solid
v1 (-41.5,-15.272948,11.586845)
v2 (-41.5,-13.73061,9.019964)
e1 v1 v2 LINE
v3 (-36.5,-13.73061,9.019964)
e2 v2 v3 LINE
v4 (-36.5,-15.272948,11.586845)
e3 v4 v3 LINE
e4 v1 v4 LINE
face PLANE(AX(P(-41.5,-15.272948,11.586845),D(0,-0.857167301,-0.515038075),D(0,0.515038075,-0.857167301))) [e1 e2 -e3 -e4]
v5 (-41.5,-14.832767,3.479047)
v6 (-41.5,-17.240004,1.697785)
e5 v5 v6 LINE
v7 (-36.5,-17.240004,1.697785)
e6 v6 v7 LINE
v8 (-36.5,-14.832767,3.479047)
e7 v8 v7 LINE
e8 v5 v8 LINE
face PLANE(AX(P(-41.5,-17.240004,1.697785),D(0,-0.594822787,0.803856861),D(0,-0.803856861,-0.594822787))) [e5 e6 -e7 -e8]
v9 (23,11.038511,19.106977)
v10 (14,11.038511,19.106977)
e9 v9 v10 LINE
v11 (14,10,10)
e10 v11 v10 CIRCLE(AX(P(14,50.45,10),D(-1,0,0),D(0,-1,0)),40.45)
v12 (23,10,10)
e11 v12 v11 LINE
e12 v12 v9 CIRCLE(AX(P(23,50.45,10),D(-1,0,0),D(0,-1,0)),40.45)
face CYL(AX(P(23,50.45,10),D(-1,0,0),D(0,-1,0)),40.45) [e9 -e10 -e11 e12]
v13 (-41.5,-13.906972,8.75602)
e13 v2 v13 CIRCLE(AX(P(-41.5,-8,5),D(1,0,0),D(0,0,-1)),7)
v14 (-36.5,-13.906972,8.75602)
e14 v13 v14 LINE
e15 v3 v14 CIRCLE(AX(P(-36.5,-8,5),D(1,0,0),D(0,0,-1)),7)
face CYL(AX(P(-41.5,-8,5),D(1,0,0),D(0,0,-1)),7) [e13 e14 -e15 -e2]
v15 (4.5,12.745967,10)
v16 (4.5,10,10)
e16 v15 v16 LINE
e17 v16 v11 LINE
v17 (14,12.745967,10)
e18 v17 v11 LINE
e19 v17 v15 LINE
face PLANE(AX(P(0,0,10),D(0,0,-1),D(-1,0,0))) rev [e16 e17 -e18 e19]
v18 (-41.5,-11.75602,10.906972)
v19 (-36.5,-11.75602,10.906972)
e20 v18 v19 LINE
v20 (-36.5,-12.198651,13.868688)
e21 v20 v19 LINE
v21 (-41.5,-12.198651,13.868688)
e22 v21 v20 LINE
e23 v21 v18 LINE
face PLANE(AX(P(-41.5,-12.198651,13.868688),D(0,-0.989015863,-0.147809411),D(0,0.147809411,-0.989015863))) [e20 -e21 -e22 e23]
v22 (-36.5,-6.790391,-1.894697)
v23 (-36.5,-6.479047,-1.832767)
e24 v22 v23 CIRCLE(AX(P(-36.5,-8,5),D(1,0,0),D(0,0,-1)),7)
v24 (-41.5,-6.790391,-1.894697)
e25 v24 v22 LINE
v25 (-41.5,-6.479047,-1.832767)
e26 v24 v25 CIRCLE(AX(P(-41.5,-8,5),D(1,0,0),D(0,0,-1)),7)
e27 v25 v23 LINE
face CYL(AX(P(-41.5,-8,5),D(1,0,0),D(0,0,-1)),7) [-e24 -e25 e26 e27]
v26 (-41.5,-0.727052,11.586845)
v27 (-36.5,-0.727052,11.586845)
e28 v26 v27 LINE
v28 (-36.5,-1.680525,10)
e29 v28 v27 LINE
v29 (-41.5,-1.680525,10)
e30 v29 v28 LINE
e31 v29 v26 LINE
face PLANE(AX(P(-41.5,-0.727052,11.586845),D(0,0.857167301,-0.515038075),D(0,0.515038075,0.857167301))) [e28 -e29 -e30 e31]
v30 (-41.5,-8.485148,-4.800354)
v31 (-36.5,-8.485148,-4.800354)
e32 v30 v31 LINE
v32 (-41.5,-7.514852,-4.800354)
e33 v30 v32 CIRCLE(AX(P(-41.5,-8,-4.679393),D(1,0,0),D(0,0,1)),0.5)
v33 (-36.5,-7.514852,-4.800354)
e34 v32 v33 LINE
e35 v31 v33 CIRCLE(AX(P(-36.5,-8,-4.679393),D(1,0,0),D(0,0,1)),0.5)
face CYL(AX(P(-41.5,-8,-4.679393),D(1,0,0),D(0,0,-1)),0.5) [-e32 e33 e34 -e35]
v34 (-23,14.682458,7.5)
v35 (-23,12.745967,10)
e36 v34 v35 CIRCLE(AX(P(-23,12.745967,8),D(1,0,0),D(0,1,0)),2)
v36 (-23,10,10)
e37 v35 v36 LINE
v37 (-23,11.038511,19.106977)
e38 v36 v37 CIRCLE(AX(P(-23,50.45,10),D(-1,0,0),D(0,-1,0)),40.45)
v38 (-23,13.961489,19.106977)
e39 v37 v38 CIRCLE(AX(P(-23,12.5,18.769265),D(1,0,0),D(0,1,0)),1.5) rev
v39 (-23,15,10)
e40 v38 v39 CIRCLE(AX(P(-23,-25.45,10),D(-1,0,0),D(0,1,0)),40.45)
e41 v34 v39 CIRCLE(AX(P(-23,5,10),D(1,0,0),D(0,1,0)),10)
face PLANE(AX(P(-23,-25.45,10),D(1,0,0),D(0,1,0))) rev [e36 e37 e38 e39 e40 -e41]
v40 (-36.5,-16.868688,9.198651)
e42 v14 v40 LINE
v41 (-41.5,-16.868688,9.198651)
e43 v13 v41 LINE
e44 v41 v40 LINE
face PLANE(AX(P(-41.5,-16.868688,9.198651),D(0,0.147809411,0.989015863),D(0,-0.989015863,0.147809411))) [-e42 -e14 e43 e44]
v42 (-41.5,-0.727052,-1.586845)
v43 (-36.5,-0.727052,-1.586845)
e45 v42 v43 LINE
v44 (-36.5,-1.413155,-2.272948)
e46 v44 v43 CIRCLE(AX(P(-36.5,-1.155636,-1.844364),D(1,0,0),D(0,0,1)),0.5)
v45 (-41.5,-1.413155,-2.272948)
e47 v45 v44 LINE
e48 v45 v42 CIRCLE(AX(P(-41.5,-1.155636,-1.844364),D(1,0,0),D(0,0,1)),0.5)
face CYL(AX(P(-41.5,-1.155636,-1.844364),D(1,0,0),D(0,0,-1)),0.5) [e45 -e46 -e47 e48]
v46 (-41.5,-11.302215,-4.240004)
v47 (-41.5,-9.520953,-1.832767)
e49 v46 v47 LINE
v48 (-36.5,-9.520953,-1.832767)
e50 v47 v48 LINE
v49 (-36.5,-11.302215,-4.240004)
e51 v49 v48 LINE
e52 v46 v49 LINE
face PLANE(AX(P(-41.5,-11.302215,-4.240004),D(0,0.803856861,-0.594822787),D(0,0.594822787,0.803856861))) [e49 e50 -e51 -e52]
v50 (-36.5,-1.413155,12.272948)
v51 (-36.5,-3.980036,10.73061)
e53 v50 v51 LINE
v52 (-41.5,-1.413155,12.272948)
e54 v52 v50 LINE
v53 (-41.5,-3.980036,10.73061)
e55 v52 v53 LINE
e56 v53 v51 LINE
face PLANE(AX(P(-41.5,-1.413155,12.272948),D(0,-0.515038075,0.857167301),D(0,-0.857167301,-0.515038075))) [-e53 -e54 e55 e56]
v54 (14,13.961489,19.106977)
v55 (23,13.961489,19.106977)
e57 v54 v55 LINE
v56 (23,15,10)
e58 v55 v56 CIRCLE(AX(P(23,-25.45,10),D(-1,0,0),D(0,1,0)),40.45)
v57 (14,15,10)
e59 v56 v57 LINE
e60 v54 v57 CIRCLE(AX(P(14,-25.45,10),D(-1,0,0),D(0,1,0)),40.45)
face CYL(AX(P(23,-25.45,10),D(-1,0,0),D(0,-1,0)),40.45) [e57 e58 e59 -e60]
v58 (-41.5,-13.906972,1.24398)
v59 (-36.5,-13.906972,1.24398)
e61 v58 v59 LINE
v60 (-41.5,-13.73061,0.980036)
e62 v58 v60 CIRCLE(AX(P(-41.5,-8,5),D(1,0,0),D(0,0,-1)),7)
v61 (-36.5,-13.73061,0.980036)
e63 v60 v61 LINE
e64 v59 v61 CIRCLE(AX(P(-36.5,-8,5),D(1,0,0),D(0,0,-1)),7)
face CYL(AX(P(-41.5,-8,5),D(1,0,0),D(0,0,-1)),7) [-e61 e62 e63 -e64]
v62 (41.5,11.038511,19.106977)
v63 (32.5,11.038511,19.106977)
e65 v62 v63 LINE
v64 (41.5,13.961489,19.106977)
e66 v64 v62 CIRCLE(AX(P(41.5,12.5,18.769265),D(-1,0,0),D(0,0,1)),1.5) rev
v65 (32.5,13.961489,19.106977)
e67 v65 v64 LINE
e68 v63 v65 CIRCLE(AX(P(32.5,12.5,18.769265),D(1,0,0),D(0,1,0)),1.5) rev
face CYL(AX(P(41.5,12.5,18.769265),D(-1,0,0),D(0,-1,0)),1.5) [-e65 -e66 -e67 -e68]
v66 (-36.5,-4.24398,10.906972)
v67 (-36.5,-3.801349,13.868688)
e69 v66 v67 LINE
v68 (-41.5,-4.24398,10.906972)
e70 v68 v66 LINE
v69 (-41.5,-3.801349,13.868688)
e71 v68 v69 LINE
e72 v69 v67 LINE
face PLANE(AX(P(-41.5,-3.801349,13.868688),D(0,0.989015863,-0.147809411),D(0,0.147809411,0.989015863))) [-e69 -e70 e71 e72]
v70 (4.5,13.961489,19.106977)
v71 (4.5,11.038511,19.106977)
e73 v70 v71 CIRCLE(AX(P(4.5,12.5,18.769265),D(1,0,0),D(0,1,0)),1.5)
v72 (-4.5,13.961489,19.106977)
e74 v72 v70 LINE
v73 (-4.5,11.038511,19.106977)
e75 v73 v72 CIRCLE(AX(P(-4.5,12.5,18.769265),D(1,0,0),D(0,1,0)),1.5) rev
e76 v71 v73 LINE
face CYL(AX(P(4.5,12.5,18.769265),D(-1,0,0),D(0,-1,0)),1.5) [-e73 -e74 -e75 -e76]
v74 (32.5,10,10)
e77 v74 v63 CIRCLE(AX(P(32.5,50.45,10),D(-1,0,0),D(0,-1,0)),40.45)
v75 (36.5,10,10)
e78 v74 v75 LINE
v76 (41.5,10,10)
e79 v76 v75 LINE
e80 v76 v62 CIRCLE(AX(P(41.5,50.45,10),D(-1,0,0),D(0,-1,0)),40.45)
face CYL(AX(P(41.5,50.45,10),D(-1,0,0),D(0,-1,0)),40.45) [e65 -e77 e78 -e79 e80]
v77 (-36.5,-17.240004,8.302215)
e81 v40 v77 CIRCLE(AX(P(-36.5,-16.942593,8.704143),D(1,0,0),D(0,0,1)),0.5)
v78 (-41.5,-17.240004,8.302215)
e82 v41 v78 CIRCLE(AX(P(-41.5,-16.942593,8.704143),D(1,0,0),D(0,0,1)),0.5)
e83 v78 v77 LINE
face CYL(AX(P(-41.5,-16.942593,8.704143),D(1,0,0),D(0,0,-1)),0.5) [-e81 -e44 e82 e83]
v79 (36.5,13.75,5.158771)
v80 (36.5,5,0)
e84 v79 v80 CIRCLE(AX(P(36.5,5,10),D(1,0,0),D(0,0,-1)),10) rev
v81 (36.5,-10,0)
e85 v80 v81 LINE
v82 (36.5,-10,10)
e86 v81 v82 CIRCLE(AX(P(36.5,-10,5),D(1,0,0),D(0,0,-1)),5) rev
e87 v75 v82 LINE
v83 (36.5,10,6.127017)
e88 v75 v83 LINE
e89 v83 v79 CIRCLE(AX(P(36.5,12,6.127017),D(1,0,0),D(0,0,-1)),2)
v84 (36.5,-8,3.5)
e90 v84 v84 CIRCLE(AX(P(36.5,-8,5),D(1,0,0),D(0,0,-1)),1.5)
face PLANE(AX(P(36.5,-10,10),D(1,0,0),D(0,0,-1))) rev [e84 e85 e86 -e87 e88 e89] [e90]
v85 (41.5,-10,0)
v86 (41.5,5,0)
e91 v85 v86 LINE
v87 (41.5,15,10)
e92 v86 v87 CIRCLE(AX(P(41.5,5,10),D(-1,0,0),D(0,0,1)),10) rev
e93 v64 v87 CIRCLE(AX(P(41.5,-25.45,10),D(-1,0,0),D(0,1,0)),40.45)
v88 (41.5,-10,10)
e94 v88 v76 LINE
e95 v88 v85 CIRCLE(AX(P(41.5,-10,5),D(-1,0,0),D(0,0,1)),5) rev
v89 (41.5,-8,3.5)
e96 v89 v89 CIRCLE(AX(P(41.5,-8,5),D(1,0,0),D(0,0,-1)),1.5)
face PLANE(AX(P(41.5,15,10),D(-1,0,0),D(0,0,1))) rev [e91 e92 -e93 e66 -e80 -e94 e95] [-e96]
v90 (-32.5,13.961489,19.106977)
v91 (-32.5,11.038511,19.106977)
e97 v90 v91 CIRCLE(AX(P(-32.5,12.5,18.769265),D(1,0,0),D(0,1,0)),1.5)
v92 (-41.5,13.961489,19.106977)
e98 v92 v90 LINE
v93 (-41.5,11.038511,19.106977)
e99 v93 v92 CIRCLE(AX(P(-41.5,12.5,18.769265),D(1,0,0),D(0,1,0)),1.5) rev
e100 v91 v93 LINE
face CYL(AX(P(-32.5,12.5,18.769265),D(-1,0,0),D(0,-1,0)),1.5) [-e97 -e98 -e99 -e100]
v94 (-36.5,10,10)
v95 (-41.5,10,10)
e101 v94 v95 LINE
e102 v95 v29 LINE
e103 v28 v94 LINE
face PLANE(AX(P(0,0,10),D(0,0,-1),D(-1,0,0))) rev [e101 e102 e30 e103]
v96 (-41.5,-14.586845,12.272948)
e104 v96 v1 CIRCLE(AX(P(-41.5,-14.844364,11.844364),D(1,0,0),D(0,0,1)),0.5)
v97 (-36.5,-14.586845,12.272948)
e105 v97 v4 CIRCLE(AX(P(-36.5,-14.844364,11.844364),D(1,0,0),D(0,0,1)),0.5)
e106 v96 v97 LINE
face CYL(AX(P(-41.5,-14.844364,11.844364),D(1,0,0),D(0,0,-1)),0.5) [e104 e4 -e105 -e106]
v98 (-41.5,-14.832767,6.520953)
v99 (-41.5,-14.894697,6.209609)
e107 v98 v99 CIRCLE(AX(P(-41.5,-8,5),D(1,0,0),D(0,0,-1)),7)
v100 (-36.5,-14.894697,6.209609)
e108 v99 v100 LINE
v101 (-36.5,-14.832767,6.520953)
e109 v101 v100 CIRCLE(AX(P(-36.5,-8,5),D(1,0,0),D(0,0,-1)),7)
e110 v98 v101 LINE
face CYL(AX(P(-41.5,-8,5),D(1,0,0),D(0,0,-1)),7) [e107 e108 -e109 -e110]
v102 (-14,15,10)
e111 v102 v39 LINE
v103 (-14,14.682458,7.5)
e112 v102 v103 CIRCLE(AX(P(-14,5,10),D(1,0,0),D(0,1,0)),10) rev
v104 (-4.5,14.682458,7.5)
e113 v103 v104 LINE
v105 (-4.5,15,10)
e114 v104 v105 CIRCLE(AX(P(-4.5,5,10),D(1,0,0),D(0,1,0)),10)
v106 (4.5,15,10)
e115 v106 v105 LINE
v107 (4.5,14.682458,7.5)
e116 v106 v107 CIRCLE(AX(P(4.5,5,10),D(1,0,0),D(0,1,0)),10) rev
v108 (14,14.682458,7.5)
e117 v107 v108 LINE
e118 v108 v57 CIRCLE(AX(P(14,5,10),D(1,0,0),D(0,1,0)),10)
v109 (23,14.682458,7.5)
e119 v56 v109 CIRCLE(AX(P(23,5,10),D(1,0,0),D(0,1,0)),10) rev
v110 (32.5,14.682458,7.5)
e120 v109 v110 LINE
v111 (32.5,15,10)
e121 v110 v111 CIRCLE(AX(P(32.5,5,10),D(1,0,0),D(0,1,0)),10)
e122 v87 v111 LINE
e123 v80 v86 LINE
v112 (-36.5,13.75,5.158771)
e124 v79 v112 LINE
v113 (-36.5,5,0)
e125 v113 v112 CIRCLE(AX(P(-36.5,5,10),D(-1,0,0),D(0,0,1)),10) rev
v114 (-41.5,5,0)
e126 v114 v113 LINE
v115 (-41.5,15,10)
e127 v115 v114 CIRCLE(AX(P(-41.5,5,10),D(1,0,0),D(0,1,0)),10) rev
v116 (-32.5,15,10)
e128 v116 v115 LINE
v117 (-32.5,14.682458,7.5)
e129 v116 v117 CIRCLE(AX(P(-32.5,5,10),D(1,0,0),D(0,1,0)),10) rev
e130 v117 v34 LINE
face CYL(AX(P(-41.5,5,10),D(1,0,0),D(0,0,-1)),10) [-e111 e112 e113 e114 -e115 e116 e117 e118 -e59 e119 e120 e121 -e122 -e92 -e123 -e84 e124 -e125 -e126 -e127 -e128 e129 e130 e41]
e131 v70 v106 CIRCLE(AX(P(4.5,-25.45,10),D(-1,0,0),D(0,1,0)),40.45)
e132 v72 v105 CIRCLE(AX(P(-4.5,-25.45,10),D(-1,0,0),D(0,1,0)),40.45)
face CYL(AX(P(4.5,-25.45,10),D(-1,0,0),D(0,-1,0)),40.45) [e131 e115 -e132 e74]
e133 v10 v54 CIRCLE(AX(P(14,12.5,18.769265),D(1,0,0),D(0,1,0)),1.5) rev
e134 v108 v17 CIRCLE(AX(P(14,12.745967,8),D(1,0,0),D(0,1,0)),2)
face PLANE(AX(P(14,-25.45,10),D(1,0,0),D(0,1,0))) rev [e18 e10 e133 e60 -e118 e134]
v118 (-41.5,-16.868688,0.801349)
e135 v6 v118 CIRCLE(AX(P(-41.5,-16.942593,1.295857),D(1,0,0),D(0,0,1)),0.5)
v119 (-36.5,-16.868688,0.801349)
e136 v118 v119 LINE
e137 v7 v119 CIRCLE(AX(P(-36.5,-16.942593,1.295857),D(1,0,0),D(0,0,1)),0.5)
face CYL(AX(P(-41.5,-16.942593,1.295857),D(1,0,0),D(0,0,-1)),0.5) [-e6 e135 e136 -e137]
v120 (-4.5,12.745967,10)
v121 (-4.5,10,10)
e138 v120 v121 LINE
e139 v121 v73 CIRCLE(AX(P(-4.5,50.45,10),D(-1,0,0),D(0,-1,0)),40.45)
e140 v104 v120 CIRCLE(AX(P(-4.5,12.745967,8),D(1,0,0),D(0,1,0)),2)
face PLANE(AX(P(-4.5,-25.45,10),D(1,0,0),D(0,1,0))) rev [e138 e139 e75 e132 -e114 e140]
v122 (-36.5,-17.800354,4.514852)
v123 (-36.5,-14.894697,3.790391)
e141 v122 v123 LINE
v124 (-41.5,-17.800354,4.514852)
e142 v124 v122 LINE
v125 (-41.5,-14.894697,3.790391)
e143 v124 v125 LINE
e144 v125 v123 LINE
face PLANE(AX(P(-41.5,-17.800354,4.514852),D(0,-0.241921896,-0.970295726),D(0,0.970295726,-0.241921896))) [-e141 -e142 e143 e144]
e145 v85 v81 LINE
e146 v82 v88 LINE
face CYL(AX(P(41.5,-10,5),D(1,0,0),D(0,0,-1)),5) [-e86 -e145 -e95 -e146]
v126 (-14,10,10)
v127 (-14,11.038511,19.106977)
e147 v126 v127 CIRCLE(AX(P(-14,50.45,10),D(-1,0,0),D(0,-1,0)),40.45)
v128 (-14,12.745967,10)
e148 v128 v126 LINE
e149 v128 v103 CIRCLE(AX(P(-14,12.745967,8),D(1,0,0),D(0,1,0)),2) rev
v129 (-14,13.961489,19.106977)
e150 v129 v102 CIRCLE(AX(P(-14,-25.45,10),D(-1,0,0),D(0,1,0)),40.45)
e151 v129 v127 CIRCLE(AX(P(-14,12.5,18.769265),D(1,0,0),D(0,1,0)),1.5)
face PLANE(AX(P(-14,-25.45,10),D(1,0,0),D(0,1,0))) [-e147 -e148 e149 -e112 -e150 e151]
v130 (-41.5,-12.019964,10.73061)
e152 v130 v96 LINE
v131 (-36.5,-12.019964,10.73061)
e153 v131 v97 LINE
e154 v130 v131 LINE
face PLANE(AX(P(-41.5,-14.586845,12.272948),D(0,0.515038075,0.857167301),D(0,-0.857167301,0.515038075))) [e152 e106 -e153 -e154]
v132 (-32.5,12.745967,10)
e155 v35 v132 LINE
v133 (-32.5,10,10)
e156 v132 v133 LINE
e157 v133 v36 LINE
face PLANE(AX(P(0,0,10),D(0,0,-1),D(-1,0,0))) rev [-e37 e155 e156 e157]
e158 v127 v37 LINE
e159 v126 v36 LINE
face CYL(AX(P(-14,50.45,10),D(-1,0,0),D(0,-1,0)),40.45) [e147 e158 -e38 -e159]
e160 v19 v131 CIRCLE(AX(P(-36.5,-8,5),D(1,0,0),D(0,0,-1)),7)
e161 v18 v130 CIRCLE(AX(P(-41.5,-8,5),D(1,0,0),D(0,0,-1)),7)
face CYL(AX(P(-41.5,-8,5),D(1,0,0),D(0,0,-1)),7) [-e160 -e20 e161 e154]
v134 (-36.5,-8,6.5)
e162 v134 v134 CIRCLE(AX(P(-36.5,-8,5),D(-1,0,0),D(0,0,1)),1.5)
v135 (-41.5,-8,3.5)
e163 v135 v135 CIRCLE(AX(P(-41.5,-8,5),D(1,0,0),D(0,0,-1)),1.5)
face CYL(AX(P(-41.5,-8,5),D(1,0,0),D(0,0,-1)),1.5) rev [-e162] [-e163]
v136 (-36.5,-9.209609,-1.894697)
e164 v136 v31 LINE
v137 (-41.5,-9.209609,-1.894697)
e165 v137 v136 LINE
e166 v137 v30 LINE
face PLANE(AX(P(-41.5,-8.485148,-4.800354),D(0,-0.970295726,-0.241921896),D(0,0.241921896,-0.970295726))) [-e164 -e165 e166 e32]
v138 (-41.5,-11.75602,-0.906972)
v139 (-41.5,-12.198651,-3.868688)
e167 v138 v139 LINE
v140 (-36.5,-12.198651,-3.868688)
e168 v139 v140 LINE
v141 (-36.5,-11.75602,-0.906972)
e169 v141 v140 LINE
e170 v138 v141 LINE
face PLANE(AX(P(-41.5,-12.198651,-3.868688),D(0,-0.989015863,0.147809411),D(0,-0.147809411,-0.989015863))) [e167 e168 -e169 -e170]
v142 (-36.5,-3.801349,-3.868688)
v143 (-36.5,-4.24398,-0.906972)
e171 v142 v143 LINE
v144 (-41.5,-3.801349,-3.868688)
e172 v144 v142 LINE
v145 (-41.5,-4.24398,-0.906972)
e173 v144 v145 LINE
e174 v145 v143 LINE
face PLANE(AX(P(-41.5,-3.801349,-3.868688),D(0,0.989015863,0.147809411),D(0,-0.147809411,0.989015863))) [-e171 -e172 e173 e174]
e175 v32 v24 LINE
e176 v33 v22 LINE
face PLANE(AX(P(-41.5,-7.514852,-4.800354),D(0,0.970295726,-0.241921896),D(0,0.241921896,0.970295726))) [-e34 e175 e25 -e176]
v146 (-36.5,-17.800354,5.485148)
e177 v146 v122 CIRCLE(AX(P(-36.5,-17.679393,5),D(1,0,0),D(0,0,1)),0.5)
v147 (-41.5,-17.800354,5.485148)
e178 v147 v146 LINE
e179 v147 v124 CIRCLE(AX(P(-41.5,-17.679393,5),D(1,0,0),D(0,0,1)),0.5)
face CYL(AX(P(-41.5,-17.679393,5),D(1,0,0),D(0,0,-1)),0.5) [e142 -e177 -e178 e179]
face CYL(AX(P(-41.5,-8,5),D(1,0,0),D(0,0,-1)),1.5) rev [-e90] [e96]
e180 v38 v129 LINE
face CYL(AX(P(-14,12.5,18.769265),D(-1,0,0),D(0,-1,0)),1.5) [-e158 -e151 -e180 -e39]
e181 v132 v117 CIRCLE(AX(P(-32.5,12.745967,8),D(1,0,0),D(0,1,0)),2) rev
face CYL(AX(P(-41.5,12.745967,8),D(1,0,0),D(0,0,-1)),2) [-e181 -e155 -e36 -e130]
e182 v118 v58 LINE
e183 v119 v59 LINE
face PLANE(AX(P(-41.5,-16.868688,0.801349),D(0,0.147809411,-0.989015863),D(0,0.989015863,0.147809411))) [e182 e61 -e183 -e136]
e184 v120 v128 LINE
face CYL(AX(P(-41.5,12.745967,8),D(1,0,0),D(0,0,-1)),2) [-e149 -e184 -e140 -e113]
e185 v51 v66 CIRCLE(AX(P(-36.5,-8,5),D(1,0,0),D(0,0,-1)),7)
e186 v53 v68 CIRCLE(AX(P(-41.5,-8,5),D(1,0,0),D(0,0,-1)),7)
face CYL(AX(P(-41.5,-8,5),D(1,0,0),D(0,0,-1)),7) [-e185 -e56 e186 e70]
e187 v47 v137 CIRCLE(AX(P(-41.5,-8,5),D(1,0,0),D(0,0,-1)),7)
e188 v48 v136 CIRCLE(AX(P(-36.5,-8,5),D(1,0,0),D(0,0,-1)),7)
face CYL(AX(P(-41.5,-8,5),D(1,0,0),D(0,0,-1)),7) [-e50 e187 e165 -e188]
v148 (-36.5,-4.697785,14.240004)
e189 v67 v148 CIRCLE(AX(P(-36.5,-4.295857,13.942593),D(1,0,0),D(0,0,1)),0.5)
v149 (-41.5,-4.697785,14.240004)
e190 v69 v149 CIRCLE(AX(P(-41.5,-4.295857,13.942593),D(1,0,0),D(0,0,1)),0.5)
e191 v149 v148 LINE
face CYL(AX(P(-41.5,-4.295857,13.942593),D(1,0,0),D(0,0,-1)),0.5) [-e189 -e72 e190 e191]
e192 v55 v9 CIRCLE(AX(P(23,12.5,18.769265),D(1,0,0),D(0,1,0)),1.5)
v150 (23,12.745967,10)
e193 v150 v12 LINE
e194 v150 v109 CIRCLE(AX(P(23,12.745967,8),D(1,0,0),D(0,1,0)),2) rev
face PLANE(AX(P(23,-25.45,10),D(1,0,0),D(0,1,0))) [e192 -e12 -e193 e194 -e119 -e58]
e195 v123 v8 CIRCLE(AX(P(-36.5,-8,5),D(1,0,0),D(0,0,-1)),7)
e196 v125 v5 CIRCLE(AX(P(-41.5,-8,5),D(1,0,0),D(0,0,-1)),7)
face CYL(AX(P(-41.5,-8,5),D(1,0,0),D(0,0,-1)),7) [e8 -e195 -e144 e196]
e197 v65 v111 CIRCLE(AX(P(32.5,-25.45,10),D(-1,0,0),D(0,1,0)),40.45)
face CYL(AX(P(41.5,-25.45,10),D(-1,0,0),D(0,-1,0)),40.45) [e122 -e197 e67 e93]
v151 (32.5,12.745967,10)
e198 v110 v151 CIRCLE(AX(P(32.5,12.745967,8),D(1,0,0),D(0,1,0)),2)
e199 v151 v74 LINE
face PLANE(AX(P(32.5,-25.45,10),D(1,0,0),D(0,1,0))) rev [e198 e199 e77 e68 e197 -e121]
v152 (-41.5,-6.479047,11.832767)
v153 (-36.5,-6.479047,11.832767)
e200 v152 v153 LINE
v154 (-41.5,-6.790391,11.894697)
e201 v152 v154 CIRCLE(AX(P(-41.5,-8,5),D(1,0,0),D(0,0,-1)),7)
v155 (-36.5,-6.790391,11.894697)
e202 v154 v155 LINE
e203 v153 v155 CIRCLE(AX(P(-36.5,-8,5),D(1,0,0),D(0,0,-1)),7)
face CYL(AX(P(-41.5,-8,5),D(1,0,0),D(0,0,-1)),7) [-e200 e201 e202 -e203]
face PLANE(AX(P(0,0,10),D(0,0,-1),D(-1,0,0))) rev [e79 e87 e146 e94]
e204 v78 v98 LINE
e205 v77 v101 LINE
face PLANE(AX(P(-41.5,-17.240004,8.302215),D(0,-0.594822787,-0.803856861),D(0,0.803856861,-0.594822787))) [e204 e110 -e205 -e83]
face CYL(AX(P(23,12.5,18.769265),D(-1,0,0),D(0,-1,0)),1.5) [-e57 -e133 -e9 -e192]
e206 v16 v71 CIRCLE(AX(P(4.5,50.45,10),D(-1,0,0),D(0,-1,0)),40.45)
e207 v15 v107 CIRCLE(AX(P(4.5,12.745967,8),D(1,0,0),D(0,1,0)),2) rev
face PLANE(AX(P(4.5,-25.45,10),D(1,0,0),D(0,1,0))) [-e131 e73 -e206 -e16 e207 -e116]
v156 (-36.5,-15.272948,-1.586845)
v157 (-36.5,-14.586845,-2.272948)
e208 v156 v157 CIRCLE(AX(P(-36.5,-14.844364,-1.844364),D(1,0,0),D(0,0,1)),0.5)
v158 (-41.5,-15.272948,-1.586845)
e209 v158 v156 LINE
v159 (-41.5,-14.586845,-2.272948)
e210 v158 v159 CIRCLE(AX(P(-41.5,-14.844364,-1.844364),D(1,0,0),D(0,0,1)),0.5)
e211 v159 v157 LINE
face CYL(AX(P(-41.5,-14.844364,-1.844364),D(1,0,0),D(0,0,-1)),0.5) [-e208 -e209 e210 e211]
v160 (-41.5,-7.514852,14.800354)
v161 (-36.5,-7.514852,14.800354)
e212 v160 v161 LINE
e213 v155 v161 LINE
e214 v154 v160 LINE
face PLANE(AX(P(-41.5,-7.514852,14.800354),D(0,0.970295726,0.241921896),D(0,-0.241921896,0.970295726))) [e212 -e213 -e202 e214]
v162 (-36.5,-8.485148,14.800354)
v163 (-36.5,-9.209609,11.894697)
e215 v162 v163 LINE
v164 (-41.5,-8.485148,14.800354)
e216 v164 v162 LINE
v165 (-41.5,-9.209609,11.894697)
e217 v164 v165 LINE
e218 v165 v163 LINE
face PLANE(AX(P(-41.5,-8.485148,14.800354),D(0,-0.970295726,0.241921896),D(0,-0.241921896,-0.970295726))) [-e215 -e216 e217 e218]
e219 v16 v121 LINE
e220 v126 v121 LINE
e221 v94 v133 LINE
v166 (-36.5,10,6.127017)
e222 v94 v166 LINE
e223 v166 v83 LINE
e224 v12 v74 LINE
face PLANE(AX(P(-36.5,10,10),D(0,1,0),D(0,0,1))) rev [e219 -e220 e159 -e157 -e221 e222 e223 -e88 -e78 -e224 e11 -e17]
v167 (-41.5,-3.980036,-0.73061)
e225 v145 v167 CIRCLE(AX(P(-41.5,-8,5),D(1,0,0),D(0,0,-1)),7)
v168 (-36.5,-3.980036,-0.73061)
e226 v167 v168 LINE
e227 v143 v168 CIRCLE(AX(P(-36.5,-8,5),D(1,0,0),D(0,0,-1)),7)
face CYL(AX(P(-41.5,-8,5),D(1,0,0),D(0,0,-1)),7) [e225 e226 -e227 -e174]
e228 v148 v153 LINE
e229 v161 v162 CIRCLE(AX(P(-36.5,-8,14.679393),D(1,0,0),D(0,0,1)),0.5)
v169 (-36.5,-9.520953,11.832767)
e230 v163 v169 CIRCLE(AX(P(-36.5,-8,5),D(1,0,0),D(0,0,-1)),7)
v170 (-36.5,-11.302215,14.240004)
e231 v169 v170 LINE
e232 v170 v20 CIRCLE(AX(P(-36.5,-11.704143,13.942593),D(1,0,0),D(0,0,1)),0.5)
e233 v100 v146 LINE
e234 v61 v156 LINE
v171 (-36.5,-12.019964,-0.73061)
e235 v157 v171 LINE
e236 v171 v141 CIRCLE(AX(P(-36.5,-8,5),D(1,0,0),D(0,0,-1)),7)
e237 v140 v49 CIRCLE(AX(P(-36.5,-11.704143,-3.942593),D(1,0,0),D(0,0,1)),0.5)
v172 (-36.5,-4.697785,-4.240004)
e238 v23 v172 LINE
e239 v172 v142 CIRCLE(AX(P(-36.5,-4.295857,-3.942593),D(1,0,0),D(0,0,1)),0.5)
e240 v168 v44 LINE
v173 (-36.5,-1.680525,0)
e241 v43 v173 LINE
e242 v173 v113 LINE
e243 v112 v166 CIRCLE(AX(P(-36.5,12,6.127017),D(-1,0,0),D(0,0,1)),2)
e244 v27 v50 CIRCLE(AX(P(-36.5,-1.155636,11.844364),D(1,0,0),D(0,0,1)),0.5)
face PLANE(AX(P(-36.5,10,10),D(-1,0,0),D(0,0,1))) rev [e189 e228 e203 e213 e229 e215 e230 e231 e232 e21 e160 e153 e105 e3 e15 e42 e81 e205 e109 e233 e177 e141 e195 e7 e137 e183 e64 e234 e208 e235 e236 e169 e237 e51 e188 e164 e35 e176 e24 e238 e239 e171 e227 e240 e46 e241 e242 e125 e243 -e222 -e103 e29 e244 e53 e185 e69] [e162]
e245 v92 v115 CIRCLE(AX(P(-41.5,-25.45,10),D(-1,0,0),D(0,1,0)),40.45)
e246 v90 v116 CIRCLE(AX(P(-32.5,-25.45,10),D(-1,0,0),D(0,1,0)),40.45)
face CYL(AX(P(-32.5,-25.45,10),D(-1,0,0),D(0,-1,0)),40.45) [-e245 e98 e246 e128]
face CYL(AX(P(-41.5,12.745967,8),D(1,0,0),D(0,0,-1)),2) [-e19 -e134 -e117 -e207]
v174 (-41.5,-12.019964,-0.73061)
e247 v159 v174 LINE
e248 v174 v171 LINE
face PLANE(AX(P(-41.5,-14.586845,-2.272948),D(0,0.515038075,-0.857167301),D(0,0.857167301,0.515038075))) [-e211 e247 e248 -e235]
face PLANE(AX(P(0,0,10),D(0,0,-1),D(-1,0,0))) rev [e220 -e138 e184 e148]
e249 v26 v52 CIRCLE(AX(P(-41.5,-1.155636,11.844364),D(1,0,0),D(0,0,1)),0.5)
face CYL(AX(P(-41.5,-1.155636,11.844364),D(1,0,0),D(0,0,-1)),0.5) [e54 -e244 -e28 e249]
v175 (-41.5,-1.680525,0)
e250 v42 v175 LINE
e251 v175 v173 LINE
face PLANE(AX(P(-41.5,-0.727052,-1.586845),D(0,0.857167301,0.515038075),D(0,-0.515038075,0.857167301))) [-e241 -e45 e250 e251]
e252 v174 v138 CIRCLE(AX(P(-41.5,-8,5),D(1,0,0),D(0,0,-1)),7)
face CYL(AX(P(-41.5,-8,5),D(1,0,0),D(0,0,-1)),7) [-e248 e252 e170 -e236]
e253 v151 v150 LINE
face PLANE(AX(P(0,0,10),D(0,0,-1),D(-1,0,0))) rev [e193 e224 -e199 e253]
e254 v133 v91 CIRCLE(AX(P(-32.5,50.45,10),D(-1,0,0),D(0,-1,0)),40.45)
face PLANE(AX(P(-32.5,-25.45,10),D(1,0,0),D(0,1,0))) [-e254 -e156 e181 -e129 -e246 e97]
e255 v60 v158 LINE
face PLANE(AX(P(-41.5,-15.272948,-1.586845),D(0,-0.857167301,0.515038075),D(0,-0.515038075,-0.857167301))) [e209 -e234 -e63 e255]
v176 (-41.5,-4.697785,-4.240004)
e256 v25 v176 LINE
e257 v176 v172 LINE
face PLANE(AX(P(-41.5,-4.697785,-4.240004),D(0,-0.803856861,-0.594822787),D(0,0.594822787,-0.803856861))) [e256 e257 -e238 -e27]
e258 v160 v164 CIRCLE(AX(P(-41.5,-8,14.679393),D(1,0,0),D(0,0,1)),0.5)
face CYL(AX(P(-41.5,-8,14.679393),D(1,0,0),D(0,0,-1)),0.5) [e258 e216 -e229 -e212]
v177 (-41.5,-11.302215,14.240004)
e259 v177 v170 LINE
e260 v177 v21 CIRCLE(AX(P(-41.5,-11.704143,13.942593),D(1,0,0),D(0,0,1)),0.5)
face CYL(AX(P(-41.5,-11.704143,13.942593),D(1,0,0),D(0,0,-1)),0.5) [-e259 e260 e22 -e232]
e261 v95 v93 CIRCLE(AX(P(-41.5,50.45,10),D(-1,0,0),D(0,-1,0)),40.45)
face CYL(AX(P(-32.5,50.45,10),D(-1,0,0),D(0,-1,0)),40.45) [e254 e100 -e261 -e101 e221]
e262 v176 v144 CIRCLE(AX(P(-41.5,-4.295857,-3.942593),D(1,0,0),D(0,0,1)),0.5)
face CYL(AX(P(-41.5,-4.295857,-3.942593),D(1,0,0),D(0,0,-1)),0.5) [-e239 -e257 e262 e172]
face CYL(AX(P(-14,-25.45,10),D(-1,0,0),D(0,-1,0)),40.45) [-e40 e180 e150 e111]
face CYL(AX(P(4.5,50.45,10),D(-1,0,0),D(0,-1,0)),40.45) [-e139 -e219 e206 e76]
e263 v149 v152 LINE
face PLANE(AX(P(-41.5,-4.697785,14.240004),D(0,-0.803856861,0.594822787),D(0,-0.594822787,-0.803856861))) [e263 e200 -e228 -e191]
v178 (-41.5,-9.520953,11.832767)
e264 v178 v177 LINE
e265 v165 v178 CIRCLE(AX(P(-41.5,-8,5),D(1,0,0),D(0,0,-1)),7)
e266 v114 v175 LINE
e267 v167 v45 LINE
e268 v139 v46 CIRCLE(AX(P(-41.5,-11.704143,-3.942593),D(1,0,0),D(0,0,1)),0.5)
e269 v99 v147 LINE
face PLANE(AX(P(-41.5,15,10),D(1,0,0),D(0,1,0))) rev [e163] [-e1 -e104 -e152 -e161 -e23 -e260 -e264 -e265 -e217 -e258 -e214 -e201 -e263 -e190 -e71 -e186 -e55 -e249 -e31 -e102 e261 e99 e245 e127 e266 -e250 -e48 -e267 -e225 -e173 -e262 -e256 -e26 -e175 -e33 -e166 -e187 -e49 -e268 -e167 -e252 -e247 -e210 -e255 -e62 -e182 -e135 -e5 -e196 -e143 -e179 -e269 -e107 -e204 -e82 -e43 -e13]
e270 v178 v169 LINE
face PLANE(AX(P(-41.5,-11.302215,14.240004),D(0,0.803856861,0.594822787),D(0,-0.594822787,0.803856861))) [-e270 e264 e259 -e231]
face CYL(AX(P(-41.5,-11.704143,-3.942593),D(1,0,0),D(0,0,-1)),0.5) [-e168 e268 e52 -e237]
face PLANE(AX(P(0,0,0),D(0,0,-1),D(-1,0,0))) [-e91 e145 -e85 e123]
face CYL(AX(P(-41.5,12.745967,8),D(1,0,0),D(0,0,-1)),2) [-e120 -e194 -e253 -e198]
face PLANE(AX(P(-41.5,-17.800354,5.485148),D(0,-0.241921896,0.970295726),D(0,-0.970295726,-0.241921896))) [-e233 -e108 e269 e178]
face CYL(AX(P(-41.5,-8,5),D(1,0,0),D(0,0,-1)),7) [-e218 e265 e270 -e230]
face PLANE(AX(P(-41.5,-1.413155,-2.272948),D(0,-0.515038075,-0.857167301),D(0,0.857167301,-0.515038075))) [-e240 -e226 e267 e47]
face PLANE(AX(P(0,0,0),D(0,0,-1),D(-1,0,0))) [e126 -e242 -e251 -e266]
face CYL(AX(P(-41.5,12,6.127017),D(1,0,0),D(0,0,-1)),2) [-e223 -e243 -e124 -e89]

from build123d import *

# Parameters (mm, degrees)
BOSS_EXTRU_1_DEPTH               = 10
BOSS_EXTRU_2_DEPTH               = 9
CONG_1_R                         = 1.5
R_P_TITION_LIN_AIRE1_COUNT       = 5
R_P_TITION_LIN_AIRE1_PITCH       = 18.5
CONG_1_OF_R_P_TITION_LIN_AIRE1_R = 1.5
ENL_V_MAT_EXTRU_1_DEPTH          = 82.974649169
ENL_V_MAT_EXTRU_1_DEPTH_BACK     = 82.974649169
ESQUISSE4_R                      = 1.5
CONG_2_RADIUS                    = 5
CONG_2_LENGTH                    = 5
CONG_3_RADIUS                    = 5
CONG_3_LENGTH                    = 5
CONG_4_R                         = 10
ESQUISSE5_R                      = 1.5
BOSS_EXTRU_3_DEPTH               = 5
CONG_7_R                         = 2
CONG_8_R                         = 2


with BuildPart() as part:
    # Esquisse1 → Boss.-Extru.1 (new body)
    with BuildSketch(Plane.XY):
        Polygon((-36.5, 10), (36.5, 10), (36.5, -10), (36.5, -15), (41.5, -15), (41.5, 15), (-41.5, 15), (-41.5, -15), (-36.5, -15), (-36.5, -10), align=None)
    extrude(amount=BOSS_EXTRU_1_DEPTH)

    # Esquisse2 → Boss.-Extru.2 (add)
    with BuildSketch(Plane.ZY.offset(41.5)):
        with BuildLine():
            Line((10, 10), (10, 15))
            ThreePointArc((10, 15), (17.110731327, 14.370095429), (24, 12.5))
            ThreePointArc((24, 12.5), (17.110731327, 10.629904571), (10, 10))
        make_face()
    boss_extru_2 = extrude(amount=-BOSS_EXTRU_2_DEPTH)

    # Congé1
    cong_1_edges = [part.edges().sort_by_distance(p)[0] for p in [
        (-37, 12.5, 24),
    ]]
    fillet(cong_1_edges, radius=CONG_1_R)

    # Répétition linéaire1: Boss.-Extru.2 ×5
    with Locations(*[(i * R_P_TITION_LIN_AIRE1_PITCH, 0, 0) for i in range(1, R_P_TITION_LIN_AIRE1_COUNT)]):
        add(boss_extru_2)

    # Congé1 of Répétition linéaire1
    cong_1_of_r_p_tition_lin_aire1_edges = [part.edges().sort_by_distance(p)[0] for p in [
        (-18.5, 12.5, 24),
        (0, 12.5, 24),
        (18.5, 12.5, 24),
        (37, 12.5, 24),
    ]]
    fillet(cong_1_of_r_p_tition_lin_aire1_edges, radius=CONG_1_OF_R_P_TITION_LIN_AIRE1_R)

    # Esquisse4 → Enlèv. mat.-Extru.1 (cut, two sides: drawn at the far end of the back side and taken through both)
    with BuildSketch(Plane(origin=(-36.5, 0, 0), x_dir=(0, 0, -1), z_dir=(1, 0, 0)).offset(-ENL_V_MAT_EXTRU_1_DEPTH_BACK)):
        with Locations((-5, -8)):
            Circle(ESQUISSE4_R)
    extrude(amount=ENL_V_MAT_EXTRU_1_DEPTH + ENL_V_MAT_EXTRU_1_DEPTH_BACK, mode=Mode.SUBTRACT)

    # Congé2: full round fillet: the end face becomes a half cylinder, R = half its width
    cong_2_face = Plane((-39, -15, 5), x_dir=(1, 0, 0), z_dir=(0, -1, 0))  # on the end face: x along it, z out of the body
    cong_2_slab = cong_2_face.offset(-CONG_2_RADIUS / 2) * Box(CONG_2_LENGTH, 2 * CONG_2_RADIUS, CONG_2_RADIUS, mode=Mode.PRIVATE)  # the body's end, R deep
    cong_2_round = Plane((-39, -10, 5), x_dir=(0, -1, 0), z_dir=(1, 0, 0)) * Cylinder(CONG_2_RADIUS, CONG_2_LENGTH, mode=Mode.PRIVATE)  # its axis R under the face
    add(cong_2_slab - cong_2_round, mode=Mode.SUBTRACT)

    # Congé3: full round fillet: the end face becomes a half cylinder, R = half its width
    cong_3_face = Plane((39, -15, 5), x_dir=(1, 0, 0), z_dir=(0, -1, 0))  # on the end face: x along it, z out of the body
    cong_3_slab = cong_3_face.offset(-CONG_3_RADIUS / 2) * Box(CONG_3_LENGTH, 2 * CONG_3_RADIUS, CONG_3_RADIUS, mode=Mode.PRIVATE)  # the body's end, R deep
    cong_3_round = Plane((39, -10, 5), x_dir=(0, -1, 0), z_dir=(1, 0, 0)) * Cylinder(CONG_3_RADIUS, CONG_3_LENGTH, mode=Mode.PRIVATE)  # its axis R under the face
    add(cong_3_slab - cong_3_round, mode=Mode.SUBTRACT)

    # Congé4
    # the kernel refuses this fillet: 10 mm, written as the material it takes off along each edge
    with BuildSketch(Plane(origin=(66.5, 15, 0), x_dir=(0, -1, 0), z_dir=(-1, 0, 0))) as cong_4_piece_1:
        with BuildLine():
            CenterArc((CONG_4_R, CONG_4_R), CONG_4_R, 180, 90)
            Line((0, CONG_4_R), (0, 0))
            Line((0, 0), (CONG_4_R, 0))
        make_face()
    extrude(amount=133, mode=Mode.SUBTRACT)

    # Esquisse5 → Boss.-Extru.3 (add, through all)
    with BuildSketch(Plane(origin=(-36.5, 0, 0), x_dir=(0, 0, -1), z_dir=(1, 0, 0))):
        with BuildLine():
            Line((-14.800353701, -8.485147863), (-11.894696869, -9.209609478))
            ThreePointArc((-11.894696869, -9.209609478), (-11.865496963, -9.365632254), (-11.832766827, -9.520952824))
            Line((-11.832766827, -9.520952824), (-14.240004245, -11.302214812))
            ThreePointArc((-14.240004245, -11.302214812), (-14.404532618, -11.895484958), (-13.868688146, -12.198651174))
            Line((-13.868688146, -12.198651174), (-10.906971813, -11.756019702))
            ThreePointArc((-10.906971813, -11.756019702), (-10.820287286, -11.888991631), (-10.730609975, -12.019963846))
            Line((-10.730609975, -12.019963846), (-12.272947904, -14.586845216))
            ThreePointArc((-12.272947904, -14.586845216), (-12.197917644, -15.197917644), (-11.586845216, -15.272947904))
            Line((-11.586845216, -15.272947904), (-9.019963846, -13.730609975))
            ThreePointArc((-9.019963846, -13.730609975), (-8.888991631, -13.820287286), (-8.756019702, -13.906971813))
            Line((-8.756019702, -13.906971813), (-9.198651174, -16.868688146))
            ThreePointArc((-9.198651174, -16.868688146), (-8.895484958, -17.404532618), (-8.302214812, -17.240004245))
            Line((-8.302214812, -17.240004245), (-6.520952824, -14.832766827))
            ThreePointArc((-6.520952824, -14.832766827), (-6.365632254, -14.865496963), (-6.209609478, -14.894696869))
            Line((-6.209609478, -14.894696869), (-5.485147863, -17.800353701))
            ThreePointArc((-5.485147863, -17.800353701), (-5, -18.179392753), (-4.514852137, -17.800353701))
            Line((-4.514852137, -17.800353701), (-3.790390522, -14.894696869))
            ThreePointArc((-3.790390522, -14.894696869), (-3.634367746, -14.865496963), (-3.479047176, -14.832766827))
            Line((-3.479047176, -14.832766827), (-1.697785188, -17.240004245))
            ThreePointArc((-1.697785188, -17.240004245), (-1.104515042, -17.404532618), (-0.801348826, -16.868688146))
            Line((-0.801348826, -16.868688146), (-1.243980298, -13.906971813))
            ThreePointArc((-1.243980298, -13.906971813), (-1.111008369, -13.820287286), (-0.980036154, -13.730609975))
            Line((-0.980036154, -13.730609975), (1.586845216, -15.272947904))
            ThreePointArc((1.586845216, -15.272947904), (2.197917644, -15.197917644), (2.272947904, -14.586845216))
            Line((2.272947904, -14.586845216), (0.730609975, -12.019963846))
            ThreePointArc((0.730609975, -12.019963846), (0.820287286, -11.888991631), (0.906971813, -11.756019702))
            Line((0.906971813, -11.756019702), (3.868688146, -12.198651174))
            ThreePointArc((3.868688146, -12.198651174), (4.404532618, -11.895484958), (4.240004245, -11.302214812))
            Line((4.240004245, -11.302214812), (1.832766827, -9.520952824))
            ThreePointArc((1.832766827, -9.520952824), (1.865496963, -9.365632254), (1.894696869, -9.209609478))
            Line((1.894696869, -9.209609478), (4.800353701, -8.485147863))
            ThreePointArc((4.800353701, -8.485147863), (5.179392753, -8), (4.800353701, -7.514852137))
            Line((4.800353701, -7.514852137), (1.894696869, -6.790390522))
            ThreePointArc((1.894696869, -6.790390522), (1.865496963, -6.634367746), (1.832766827, -6.479047176))
            Line((1.832766827, -6.479047176), (4.240004245, -4.697785188))
            ThreePointArc((4.240004245, -4.697785188), (4.404532618, -4.104515042), (3.868688146, -3.801348826))
            Line((3.868688146, -3.801348826), (0.906971813, -4.243980298))
            ThreePointArc((0.906971813, -4.243980298), (0.820287286, -4.111008369), (0.730609975, -3.980036154))
            Line((0.730609975, -3.980036154), (2.272947904, -1.413154784))
            ThreePointArc((2.272947904, -1.413154784), (2.197917644, -0.802082356), (1.586845216, -0.727052096))
            Line((1.586845216, -0.727052096), (-0.980036154, -2.269390025))
            ThreePointArc((-0.980036154, -2.269390025), (-1.111008369, -2.179712714), (-1.243980298, -2.093028187))
            Line((-1.243980298, -2.093028187), (-0.801348826, 0.868688146))
            ThreePointArc((-0.801348826, 0.868688146), (-1.104515042, 1.404532618), (-1.697785188, 1.240004245))
            Line((-1.697785188, 1.240004245), (-3.479047176, -1.167233173))
            ThreePointArc((-3.479047176, -1.167233173), (-3.634367746, -1.134503037), (-3.790390522, -1.105303131))
            Line((-3.790390522, -1.105303131), (-4.514852137, 1.800353701))
            ThreePointArc((-4.514852137, 1.800353701), (-5, 2.179392753), (-5.485147863, 1.800353701))
            Line((-5.485147863, 1.800353701), (-6.209609478, -1.105303131))
            ThreePointArc((-6.209609478, -1.105303131), (-6.365632254, -1.134503037), (-6.520952824, -1.167233173))
            Line((-6.520952824, -1.167233173), (-8.302214812, 1.240004245))
            ThreePointArc((-8.302214812, 1.240004245), (-8.895484958, 1.404532618), (-9.198651174, 0.868688146))
            Line((-9.198651174, 0.868688146), (-8.756019702, -2.093028187))
            ThreePointArc((-8.756019702, -2.093028187), (-8.888991631, -2.179712714), (-9.019963846, -2.269390025))
            Line((-9.019963846, -2.269390025), (-11.586845216, -0.727052096))
            ThreePointArc((-11.586845216, -0.727052096), (-12.197917644, -0.802082356), (-12.272947904, -1.413154784))
            Line((-12.272947904, -1.413154784), (-10.730609975, -3.980036154))
            ThreePointArc((-10.730609975, -3.980036154), (-10.820287286, -4.111008369), (-10.906971813, -4.243980298))
            Line((-10.906971813, -4.243980298), (-13.868688146, -3.801348826))
            ThreePointArc((-13.868688146, -3.801348826), (-14.404532618, -4.104515042), (-14.240004245, -4.697785188))
            Line((-14.240004245, -4.697785188), (-11.832766827, -6.479047176))
            ThreePointArc((-11.832766827, -6.479047176), (-11.865496963, -6.634367746), (-11.894696869, -6.790390522))
            Line((-11.894696869, -6.790390522), (-14.800353701, -7.514852137))
            ThreePointArc((-14.800353701, -7.514852137), (-15.179392753, -8), (-14.800353701, -8.485147863))
        make_face()
        with Locations((-5, -8)):
            Circle(ESQUISSE5_R, mode=Mode.SUBTRACT)
    extrude(amount=-BOSS_EXTRU_3_DEPTH)

    # Congé7
    cong_7_edges = [part.edges().sort_by_distance(p)[0] for p in [
        (0, 10, 1.339745962),
    ]]
    fillet(cong_7_edges, radius=CONG_7_R)

    # Congé8
    cong_8_edges = [part.edges().sort_by_distance(p)[0] for p in [
        (-27.75, 15, 10),
        (-9.25, 15, 10),
        (9.25, 15, 10),
        (27.75, 15, 10),
    ]]
    fillet(cong_8_edges, radius=CONG_8_R)


solid = part.part
